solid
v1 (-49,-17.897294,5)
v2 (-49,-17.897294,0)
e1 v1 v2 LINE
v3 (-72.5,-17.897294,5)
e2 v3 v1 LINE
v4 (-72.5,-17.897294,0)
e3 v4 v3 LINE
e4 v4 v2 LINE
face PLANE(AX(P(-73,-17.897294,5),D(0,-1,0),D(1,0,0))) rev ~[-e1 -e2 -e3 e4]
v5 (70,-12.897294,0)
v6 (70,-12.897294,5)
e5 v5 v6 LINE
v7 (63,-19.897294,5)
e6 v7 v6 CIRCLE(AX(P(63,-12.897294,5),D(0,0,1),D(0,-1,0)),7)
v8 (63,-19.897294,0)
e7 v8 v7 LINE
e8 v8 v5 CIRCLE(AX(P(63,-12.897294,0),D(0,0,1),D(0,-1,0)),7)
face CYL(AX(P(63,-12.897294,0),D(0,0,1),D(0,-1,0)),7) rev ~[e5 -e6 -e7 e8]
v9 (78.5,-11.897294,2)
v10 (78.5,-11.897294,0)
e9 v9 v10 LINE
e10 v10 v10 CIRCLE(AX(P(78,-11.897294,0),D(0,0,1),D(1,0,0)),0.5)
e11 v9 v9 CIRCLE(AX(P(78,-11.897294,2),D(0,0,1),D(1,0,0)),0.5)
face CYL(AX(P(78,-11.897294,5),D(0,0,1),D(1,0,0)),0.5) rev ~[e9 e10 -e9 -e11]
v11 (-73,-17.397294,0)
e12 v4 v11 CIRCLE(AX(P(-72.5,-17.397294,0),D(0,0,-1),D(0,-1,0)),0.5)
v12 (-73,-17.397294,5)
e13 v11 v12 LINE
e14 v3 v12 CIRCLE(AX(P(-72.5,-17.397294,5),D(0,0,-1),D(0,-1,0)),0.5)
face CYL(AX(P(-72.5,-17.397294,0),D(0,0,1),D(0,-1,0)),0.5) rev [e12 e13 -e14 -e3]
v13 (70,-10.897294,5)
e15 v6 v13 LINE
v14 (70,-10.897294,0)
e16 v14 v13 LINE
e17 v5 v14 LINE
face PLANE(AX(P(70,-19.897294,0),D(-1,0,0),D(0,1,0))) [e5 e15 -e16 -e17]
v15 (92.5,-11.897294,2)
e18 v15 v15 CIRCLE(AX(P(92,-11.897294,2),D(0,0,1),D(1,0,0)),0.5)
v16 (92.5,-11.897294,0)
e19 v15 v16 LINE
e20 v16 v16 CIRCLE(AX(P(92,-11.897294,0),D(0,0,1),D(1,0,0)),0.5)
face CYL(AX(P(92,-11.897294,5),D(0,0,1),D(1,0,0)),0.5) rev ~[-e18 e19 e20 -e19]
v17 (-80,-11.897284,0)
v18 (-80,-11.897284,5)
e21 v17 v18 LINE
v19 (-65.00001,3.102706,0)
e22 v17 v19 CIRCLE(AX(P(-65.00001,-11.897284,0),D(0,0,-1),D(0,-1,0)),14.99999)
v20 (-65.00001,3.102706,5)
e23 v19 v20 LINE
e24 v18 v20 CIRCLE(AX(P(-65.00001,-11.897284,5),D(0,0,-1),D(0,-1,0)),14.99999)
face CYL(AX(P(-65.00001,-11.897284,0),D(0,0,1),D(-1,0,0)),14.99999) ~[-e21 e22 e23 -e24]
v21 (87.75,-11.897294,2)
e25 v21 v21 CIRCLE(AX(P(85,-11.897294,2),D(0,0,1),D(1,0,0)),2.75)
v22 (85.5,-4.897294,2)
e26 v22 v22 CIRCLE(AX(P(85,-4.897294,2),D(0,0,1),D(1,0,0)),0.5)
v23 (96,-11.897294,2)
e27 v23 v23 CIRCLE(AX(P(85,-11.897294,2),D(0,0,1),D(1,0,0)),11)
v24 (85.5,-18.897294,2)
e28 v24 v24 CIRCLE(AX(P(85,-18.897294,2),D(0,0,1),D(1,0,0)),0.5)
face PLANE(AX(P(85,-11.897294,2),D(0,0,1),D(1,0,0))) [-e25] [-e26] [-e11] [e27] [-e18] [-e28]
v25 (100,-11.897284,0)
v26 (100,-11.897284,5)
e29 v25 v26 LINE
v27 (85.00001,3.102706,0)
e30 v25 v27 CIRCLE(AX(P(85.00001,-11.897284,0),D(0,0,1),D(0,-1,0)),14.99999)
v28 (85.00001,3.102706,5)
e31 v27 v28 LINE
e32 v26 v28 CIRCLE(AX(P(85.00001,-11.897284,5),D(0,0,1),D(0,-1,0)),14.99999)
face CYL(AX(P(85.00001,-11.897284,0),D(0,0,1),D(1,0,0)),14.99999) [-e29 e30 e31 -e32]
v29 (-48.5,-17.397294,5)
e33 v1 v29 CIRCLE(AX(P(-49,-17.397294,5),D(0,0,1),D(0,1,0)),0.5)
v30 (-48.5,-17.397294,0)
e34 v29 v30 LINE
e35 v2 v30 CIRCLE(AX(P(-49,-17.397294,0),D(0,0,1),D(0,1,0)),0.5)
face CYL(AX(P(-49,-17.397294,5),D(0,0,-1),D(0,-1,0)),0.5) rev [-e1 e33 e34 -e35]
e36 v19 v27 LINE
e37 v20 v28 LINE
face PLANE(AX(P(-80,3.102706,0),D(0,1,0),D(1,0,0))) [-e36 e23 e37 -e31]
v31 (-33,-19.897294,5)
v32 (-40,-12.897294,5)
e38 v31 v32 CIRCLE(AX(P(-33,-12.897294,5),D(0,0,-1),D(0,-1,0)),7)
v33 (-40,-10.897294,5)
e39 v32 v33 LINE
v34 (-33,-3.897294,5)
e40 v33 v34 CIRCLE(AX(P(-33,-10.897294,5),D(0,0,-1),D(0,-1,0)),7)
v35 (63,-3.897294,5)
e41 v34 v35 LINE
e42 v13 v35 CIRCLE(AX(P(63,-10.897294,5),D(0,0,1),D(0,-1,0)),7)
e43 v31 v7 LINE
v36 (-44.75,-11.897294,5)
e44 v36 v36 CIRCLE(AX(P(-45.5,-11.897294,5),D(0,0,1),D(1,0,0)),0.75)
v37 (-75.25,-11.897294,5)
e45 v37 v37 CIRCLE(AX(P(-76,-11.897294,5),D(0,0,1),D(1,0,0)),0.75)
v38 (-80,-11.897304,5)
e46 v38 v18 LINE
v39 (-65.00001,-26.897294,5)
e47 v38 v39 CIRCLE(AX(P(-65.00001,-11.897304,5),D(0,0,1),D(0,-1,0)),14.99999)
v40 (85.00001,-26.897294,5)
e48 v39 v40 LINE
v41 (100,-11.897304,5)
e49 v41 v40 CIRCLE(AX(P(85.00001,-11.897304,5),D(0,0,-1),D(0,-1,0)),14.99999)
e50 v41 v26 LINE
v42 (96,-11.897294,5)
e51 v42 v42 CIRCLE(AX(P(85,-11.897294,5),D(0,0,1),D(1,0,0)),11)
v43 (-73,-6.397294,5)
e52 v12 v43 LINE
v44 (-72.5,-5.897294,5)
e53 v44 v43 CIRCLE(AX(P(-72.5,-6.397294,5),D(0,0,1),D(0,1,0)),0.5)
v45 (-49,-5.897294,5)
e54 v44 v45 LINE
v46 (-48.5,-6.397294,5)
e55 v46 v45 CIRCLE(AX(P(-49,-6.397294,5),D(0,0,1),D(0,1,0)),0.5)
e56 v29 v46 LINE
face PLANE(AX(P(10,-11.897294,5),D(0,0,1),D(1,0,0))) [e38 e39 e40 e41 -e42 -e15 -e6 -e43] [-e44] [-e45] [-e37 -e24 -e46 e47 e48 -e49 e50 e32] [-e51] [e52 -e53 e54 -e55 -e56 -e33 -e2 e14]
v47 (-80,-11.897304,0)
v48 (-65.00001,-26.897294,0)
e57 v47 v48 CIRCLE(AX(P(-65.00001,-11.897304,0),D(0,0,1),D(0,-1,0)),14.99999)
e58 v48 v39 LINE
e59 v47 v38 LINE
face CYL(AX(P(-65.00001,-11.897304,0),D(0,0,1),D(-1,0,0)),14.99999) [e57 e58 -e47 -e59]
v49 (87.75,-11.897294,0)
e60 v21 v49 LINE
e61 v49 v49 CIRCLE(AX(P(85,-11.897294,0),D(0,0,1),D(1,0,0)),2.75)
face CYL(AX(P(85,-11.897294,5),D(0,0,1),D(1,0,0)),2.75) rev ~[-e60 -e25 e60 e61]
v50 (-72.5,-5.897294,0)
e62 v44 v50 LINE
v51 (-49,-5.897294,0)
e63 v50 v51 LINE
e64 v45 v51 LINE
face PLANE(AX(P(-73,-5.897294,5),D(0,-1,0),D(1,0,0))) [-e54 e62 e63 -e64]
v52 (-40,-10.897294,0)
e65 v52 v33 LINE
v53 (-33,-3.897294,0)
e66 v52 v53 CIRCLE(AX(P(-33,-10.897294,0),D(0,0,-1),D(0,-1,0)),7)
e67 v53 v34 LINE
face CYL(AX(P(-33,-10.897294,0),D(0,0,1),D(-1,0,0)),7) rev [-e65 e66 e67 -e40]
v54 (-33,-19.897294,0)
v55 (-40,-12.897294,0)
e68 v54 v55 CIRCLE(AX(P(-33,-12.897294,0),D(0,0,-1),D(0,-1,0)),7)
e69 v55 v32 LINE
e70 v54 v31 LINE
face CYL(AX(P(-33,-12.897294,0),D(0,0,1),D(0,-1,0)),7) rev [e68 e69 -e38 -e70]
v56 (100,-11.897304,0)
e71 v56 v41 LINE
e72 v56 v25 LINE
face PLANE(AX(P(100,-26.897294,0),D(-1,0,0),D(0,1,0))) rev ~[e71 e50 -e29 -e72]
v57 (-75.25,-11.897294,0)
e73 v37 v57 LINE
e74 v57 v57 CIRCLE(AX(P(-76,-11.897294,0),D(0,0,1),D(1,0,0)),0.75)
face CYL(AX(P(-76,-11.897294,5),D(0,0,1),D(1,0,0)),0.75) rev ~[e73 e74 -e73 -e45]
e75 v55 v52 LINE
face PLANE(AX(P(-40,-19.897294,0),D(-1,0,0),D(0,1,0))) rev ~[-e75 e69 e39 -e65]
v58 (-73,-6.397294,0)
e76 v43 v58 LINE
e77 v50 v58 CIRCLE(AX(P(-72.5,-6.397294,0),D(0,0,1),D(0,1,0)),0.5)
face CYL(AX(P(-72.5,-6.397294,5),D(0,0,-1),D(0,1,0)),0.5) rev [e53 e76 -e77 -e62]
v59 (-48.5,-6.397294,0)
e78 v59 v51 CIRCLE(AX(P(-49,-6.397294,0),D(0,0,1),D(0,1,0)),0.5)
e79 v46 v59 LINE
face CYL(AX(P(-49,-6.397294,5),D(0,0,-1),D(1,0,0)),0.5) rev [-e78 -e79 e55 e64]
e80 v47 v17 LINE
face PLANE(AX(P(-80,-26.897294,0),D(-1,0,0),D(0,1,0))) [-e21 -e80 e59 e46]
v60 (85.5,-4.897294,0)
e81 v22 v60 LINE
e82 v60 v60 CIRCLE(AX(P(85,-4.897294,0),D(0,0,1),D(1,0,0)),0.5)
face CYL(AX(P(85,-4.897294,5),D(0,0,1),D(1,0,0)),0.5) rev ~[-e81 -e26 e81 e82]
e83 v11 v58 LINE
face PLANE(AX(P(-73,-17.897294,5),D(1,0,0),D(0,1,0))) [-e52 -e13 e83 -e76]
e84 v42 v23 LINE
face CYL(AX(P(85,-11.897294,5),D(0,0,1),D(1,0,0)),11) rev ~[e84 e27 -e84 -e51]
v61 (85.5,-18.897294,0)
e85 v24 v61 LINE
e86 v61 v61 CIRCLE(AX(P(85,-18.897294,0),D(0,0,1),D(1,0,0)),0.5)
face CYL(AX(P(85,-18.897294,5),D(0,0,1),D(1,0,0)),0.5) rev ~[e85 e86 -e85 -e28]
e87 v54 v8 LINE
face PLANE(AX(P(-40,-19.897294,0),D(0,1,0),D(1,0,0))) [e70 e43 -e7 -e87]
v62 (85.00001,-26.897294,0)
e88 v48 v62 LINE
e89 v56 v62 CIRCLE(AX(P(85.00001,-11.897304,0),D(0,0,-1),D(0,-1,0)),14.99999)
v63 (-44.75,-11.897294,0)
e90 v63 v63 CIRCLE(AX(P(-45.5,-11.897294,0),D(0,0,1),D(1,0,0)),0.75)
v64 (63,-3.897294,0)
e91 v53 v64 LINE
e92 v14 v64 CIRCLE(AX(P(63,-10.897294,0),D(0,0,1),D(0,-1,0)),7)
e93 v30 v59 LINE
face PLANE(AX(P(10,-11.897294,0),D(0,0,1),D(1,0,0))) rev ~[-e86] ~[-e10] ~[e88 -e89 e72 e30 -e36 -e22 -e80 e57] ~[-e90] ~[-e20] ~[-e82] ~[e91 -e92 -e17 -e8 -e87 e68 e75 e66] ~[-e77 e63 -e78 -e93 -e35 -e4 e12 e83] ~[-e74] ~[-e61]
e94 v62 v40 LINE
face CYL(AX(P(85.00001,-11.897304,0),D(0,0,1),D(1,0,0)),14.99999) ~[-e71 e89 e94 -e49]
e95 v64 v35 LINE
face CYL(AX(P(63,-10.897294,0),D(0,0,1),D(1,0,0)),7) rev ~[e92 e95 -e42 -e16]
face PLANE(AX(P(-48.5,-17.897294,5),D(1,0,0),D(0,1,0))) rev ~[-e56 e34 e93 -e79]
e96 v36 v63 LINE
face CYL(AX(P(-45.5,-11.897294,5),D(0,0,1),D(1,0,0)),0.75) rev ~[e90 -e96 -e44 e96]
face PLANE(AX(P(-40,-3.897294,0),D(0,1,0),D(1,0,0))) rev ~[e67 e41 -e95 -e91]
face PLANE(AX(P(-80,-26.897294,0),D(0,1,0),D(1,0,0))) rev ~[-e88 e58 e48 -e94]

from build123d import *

# Parameters (mm, degrees)
F0_W     = 180
F0_H     = 30
F0_W_2   = 110
F0_H_2   = 16
F1_DEPTH = 5
F2_R     = 11
F2_R_2   = 0.5
F2_R_3   = 2.75
F2_W     = 24.5
F2_H     = 12
F3_DEPTH = 3
F2_R_4   = 0.75
F4_DEPTH = 25
F5_R     = 14.99999
F6_R     = 7
F7_R     = 0.5


# Not quite as in the source:
# - a fillet or chamfer is up to 0.001 mm smaller than in the source, because OpenCascade refuses the exact size
# - a feature names something its author has since deleted; it is built from what else it names


with BuildPart() as f1:
    # F0 (on Top) → F1 (new body)
    with BuildSketch(Plane.XY):
        with Locations((10, -11.8972941886)):
            Rectangle(F0_W, F0_H)
        with Locations((15, -11.8972941886)):
            Rectangle(F0_W_2, F0_H_2, mode=Mode.SUBTRACT)
    extrude(amount=F1_DEPTH)

    # F2 (on face) → F3 (cut)
    with BuildSketch(Plane.XY.offset(5)):
        with Locations((85, -11.8972941886)):
            Circle(F2_R)
        with Locations((85, -18.8972941886)):
            Circle(F2_R_2, mode=Mode.SUBTRACT)
        with Locations((85, -11.8972941886)):
            Circle(F2_R_3, mode=Mode.SUBTRACT)
        with Locations((78, -11.8972941886)):
            Circle(F2_R_2, mode=Mode.SUBTRACT)
        with Locations((92, -11.8972941886)):
            Circle(F2_R_2, mode=Mode.SUBTRACT)
        with Locations((85, -4.8972941886)):
            Circle(F2_R_2, mode=Mode.SUBTRACT)
        with Locations((-60.75, -11.8972941886)):
            Rectangle(F2_W, F2_H)
        with Locations((-65, -11.8972941886)):
            Circle(F2_R_3, mode=Mode.SUBTRACT)
    extrude(amount=-F3_DEPTH, mode=Mode.SUBTRACT)

    # F2 (on face) → F4 (cut)
    with BuildSketch(Plane.XY.offset(5)):
        with Locations((-60.75, -11.8972941886)):
            Rectangle(F2_W, F2_H)
        with Locations((-65, -11.8972941886)):
            Circle(F2_R_3, mode=Mode.SUBTRACT)
        with Locations((85, -11.8972941886)):
            Circle(F2_R_3)
        with Locations((-65, -11.8972941886)):
            Circle(F2_R_3)
        with Locations((-76, -11.8972941886)):
            Circle(F2_R_4)
        with Locations((-45.5, -11.8972941886)):
            Circle(F2_R_4)
        with Locations((85, -4.8972941886)):
            Circle(F2_R_2)
        with Locations((78, -11.8972941886)):
            Circle(F2_R_2)
        with Locations((85, -18.8972941886)):
            Circle(F2_R_2)
        with Locations((92, -11.8972941886)):
            Circle(F2_R_2)
    extrude(amount=-F4_DEPTH, mode=Mode.SUBTRACT)

    # F5 (radius 15 in the source; OpenCascade refuses exactly that, so slightly less here)
    f5_edges = [f1.edges().sort_by_distance(p)[0] for p in [
        (100, 3.102706, 2.5),
        (100, -26.897294, 2.5),
        (-80, -26.897294, 2.5),
        (-80, 3.102706, 2.5),
    ]]
    fillet(f5_edges, radius=F5_R)

    # F6
    f6_edges = [f1.edges().sort_by_distance(p)[0] for p in [
        (-40, -3.897294, 2.5),
        (-40, -19.897294, 2.5),
        (70, -3.897294, 2.5),
        (70, -19.897294, 2.5),
    ]]
    fillet(f6_edges, radius=F6_R)

    # F7
    f7_edges = [f1.edges().sort_by_distance(p)[0] for p in [
        (-73, -5.897294, 2.5),
        (-73, -17.897294, 2.5),
        (-48.5, -5.897294, 2.5),
        (-48.5, -17.897294, 2.5),
    ]]
    fillet(f7_edges, radius=F7_R)


solid = f1.part
